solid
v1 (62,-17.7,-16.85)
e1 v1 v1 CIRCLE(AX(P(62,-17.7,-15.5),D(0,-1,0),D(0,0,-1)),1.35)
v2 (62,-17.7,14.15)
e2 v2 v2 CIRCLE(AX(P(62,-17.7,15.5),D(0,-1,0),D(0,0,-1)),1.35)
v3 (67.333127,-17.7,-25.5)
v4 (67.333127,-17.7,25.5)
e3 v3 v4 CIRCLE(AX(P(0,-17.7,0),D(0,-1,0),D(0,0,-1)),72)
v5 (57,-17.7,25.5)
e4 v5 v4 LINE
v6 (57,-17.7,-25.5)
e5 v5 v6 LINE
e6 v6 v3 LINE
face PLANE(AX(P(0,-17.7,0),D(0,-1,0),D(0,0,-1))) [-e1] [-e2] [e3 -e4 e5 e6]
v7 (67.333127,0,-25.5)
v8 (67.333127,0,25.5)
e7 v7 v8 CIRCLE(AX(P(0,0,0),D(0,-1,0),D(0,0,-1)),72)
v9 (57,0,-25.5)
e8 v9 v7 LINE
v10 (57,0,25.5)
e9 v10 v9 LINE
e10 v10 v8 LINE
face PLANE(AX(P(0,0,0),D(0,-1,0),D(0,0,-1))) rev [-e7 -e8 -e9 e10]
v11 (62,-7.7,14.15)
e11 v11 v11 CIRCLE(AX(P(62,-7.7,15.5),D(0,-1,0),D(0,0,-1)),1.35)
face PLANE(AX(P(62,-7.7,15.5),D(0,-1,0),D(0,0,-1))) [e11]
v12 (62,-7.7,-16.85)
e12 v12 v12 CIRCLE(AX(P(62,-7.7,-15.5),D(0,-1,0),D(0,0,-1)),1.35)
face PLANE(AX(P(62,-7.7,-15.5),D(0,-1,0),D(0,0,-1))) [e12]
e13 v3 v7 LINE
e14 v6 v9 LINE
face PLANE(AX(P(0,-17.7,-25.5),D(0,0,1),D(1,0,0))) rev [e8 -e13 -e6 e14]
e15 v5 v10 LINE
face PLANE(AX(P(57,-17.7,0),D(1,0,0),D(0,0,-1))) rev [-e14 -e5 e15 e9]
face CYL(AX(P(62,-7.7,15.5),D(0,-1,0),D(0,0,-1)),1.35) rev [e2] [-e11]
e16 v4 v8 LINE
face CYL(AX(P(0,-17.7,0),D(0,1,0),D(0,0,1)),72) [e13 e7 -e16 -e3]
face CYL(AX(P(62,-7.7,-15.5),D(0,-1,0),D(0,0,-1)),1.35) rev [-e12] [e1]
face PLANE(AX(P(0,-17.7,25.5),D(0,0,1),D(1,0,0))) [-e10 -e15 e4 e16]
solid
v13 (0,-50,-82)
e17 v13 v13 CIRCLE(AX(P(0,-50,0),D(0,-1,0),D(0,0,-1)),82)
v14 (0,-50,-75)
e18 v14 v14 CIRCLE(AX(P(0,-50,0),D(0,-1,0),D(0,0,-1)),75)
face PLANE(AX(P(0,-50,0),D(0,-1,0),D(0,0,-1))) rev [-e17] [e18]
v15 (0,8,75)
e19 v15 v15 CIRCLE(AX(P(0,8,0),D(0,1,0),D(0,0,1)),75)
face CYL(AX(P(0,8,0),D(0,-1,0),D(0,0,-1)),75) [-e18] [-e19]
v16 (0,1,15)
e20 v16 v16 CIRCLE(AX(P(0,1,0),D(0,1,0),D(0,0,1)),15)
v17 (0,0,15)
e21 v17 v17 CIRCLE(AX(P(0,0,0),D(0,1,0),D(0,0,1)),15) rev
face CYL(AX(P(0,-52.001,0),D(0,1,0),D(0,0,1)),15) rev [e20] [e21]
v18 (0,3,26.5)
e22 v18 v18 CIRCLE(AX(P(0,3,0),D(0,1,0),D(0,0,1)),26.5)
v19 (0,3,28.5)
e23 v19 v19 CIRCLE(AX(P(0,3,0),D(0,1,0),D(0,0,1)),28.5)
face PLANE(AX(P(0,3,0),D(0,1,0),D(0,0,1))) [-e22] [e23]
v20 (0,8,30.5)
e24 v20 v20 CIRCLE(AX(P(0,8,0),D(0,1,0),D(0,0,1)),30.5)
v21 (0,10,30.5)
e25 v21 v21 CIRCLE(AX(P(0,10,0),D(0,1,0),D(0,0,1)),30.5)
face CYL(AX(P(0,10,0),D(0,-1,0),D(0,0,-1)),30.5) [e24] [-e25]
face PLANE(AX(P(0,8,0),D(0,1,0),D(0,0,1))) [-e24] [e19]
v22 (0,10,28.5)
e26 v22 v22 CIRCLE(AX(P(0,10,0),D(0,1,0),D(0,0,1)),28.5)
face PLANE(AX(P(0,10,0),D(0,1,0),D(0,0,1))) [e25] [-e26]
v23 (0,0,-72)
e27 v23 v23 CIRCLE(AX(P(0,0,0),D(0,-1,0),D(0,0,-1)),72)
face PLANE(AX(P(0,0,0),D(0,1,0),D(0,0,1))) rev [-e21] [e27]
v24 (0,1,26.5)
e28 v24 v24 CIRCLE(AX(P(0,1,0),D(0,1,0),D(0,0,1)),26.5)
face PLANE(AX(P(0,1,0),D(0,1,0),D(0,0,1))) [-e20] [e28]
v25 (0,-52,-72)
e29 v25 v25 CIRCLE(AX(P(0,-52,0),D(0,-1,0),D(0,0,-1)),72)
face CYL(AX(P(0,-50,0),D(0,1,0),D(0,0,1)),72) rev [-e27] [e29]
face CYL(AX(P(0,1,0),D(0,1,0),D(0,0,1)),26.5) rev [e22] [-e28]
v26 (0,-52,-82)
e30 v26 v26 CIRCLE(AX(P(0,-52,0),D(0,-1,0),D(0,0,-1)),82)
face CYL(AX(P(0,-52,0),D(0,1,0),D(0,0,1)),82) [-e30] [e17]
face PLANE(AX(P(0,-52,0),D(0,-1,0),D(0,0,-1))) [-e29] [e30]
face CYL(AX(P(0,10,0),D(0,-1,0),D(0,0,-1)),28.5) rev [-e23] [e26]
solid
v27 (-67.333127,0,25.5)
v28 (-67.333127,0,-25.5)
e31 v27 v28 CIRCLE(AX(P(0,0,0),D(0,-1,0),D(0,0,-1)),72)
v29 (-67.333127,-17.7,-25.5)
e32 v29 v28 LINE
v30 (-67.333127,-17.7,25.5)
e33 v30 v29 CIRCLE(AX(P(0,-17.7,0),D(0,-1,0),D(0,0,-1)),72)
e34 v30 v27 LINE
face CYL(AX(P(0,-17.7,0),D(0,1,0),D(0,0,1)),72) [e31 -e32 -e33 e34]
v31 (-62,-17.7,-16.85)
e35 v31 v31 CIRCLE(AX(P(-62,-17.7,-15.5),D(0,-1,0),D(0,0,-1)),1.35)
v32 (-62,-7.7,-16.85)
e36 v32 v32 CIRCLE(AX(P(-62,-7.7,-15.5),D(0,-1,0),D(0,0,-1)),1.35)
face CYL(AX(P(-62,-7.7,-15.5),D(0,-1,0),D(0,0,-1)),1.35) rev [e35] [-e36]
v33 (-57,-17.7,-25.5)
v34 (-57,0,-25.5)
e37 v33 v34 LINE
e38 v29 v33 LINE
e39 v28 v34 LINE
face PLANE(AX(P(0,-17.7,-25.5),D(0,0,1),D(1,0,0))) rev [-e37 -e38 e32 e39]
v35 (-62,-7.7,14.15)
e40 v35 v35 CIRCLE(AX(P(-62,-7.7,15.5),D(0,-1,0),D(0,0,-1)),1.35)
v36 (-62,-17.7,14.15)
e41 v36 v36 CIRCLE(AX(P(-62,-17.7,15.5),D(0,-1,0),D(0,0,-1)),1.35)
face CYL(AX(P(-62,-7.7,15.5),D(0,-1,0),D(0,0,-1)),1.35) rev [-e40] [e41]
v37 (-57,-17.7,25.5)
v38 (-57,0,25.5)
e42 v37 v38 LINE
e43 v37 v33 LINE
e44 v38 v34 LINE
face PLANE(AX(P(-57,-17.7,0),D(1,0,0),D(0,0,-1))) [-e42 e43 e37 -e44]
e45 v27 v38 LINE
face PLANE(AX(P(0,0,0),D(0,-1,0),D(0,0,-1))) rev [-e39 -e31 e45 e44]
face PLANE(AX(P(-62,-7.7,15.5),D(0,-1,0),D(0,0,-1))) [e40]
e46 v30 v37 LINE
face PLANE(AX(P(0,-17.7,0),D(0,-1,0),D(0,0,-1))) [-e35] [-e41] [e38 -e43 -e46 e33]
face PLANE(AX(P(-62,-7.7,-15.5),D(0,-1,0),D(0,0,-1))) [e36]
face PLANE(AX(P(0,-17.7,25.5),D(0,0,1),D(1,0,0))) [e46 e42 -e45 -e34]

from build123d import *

# Parameters (mm, degrees)
SKETCH_1_R          = 75
EXTRUDE_1_DEPTH     = 8
EXTRUDE_START       = 50
SKETCH_2_R          = 75
SKETCH_2_R_2        = 72
EXTRUDE_2_DEPTH     = 50
EXTRUDE_START_2     = 2
SKETCH_3_R          = 82
SKETCH_3_R_2        = 72
EXTRUDE_3_DEPTH     = 2
SKETCH_4_R          = 30.5
SKETCH_4_R_2        = 28.5
EXTRUDE_4_DEPTH     = 2
CUT_EXTRUDE_START   = -5
SKETCH_5_R          = 28.5
CUT_EXTRUDE_1_DEPTH = 5
SKETCH_6_R          = 26.5
CUT_EXTRUDE_2_DEPTH = 2
CUT_EXTRUDE_3_REACH = 129.503
SKETCH_7_R          = 15
EXTRUDE_6_DEPTH     = 17.7
SKETCH_10_R         = 1.35
CUT_EXTRUDE_4_DEPTH = 10


# Read off the part's stored shape, not the designer's step: 보스-돌출6
with BuildPart() as part:
    # 스케치1 → 보스-돌출1 (new body)
    with BuildSketch(Plane(origin=(0, 0, 0), x_dir=(1, 0, 0), z_dir=(0, 1, 0))):
        with Locations(Location((0, 0, 0), (0, 0, 270))):
            Circle(SKETCH_1_R)
    extrude(amount=EXTRUDE_1_DEPTH)

    # 스케치2 → 보스-돌출2 (add)
    with BuildSketch(Plane.XZ.offset(EXTRUDE_START)):
        with Locations(Location((0, 0, 0), (0, 0, 270))):
            Circle(SKETCH_2_R)
        with Locations(Location((0, 0, 0), (0, 0, 270))):
            Circle(SKETCH_2_R_2, mode=Mode.SUBTRACT)
    extrude(amount=-EXTRUDE_2_DEPTH)

    # 스케치3 → 보스-돌출3 (add)
    with BuildSketch(Plane.XZ.offset(50).offset(EXTRUDE_START_2)):
        with Locations(Location((0, 0, 0), (0, 0, 270))):
            Circle(SKETCH_3_R)
        with Locations(Location((0, 0, 0), (0, 0, 270))):
            Circle(SKETCH_3_R_2, mode=Mode.SUBTRACT)
    extrude(amount=-EXTRUDE_3_DEPTH)

    # 스케치4 → 보스-돌출4 (add)
    with BuildSketch(Plane(origin=(0, 8, 0), x_dir=(1, 0, 0), z_dir=(0, 1, 0))):
        with Locations(Location((0, 0, 0), (0, 0, 270))):
            Circle(SKETCH_4_R)
        with Locations(Location((0, 0, 0), (0, 0, 270))):
            Circle(SKETCH_4_R_2, mode=Mode.SUBTRACT)
    extrude(amount=EXTRUDE_4_DEPTH)

    # 스케치5 → 컷-돌출1 (cut)
    with BuildSketch(Plane(origin=(0, 8, 0), x_dir=(1, 0, 0), z_dir=(0, 1, 0)).offset(CUT_EXTRUDE_START)):
        with Locations(Location((0, 0, 0), (0, 0, 270))):
            Circle(SKETCH_5_R)
    extrude(amount=CUT_EXTRUDE_1_DEPTH, mode=Mode.SUBTRACT)

    # 스케치6 → 컷-돌출2 (cut)
    with BuildSketch(Plane(origin=(0, 3, 0), x_dir=(1, 0, 0), z_dir=(0, 1, 0))):
        with Locations(Location((0, 0, 0), (0, 0, 270))):
            Circle(SKETCH_6_R)
    extrude(amount=-CUT_EXTRUDE_2_DEPTH, mode=Mode.SUBTRACT)

    # 스케치7 → 컷-돌출3 (cut, up to next)
    with BuildSketch(Plane(origin=(0, 1, 0), x_dir=(1, 0, 0), z_dir=(0, 1, 0)), mode=Mode.PRIVATE) as cut_extrude_3_sk1:
        with Locations(Location((0, 0, 0), (0, 0, 270))):
            Circle(SKETCH_7_R)
    cut_extrude_3_tool1 = extrude(cut_extrude_3_sk1.sketch, amount=-CUT_EXTRUDE_3_REACH, mode=Mode.PRIVATE) & part.part
    add(cut_extrude_3_tool1.solids().sort_by_distance((0, 1, 0))[0], mode=Mode.SUBTRACT)


with BuildPart() as body_2:
    # 보스-돌출6 outline → 보스-돌출6 (new body)
    with BuildSketch(Plane.XZ):
        with BuildLine():
            Line((57, 25.5), (57, -25.5))
            Line((57, -25.5), (67.333127062, -25.5))
            ThreePointArc((67.333127062, -25.5), (72, 0), (67.333127062, 25.5))
            Line((67.333127062, 25.5), (57, 25.5))
        make_face()
        with BuildLine():
            Line((-67.333127062, -25.5), (-57, -25.5))
            Line((-57, -25.5), (-57, 25.5))
            Line((-57, 25.5), (-67.333127062, 25.5))
            ThreePointArc((-67.333127062, 25.5), (-72, 0), (-67.333127062, -25.5))
        make_face()
    extrude(amount=EXTRUDE_6_DEPTH)

    # 스케치10 → 컷-돌출4 (cut)
    with BuildSketch(Plane.XZ.offset(17.7)):
        with Locations(Location((-62, 15.5, 0), (0, 0, 270))):
            Circle(SKETCH_10_R)
        with Locations(Location((-62, -15.5, 0), (0, 0, 270))):
            Circle(SKETCH_10_R)
        with Locations(Location((62, 15.5, 0), (0, 0, 270))):
            Circle(SKETCH_10_R)
        with Locations(Location((62, -15.5, 0), (0, 0, 270))):
            Circle(SKETCH_10_R)
    extrude(amount=-CUT_EXTRUDE_4_DEPTH, mode=Mode.SUBTRACT)


solid = Compound([part.part, body_2.part])
